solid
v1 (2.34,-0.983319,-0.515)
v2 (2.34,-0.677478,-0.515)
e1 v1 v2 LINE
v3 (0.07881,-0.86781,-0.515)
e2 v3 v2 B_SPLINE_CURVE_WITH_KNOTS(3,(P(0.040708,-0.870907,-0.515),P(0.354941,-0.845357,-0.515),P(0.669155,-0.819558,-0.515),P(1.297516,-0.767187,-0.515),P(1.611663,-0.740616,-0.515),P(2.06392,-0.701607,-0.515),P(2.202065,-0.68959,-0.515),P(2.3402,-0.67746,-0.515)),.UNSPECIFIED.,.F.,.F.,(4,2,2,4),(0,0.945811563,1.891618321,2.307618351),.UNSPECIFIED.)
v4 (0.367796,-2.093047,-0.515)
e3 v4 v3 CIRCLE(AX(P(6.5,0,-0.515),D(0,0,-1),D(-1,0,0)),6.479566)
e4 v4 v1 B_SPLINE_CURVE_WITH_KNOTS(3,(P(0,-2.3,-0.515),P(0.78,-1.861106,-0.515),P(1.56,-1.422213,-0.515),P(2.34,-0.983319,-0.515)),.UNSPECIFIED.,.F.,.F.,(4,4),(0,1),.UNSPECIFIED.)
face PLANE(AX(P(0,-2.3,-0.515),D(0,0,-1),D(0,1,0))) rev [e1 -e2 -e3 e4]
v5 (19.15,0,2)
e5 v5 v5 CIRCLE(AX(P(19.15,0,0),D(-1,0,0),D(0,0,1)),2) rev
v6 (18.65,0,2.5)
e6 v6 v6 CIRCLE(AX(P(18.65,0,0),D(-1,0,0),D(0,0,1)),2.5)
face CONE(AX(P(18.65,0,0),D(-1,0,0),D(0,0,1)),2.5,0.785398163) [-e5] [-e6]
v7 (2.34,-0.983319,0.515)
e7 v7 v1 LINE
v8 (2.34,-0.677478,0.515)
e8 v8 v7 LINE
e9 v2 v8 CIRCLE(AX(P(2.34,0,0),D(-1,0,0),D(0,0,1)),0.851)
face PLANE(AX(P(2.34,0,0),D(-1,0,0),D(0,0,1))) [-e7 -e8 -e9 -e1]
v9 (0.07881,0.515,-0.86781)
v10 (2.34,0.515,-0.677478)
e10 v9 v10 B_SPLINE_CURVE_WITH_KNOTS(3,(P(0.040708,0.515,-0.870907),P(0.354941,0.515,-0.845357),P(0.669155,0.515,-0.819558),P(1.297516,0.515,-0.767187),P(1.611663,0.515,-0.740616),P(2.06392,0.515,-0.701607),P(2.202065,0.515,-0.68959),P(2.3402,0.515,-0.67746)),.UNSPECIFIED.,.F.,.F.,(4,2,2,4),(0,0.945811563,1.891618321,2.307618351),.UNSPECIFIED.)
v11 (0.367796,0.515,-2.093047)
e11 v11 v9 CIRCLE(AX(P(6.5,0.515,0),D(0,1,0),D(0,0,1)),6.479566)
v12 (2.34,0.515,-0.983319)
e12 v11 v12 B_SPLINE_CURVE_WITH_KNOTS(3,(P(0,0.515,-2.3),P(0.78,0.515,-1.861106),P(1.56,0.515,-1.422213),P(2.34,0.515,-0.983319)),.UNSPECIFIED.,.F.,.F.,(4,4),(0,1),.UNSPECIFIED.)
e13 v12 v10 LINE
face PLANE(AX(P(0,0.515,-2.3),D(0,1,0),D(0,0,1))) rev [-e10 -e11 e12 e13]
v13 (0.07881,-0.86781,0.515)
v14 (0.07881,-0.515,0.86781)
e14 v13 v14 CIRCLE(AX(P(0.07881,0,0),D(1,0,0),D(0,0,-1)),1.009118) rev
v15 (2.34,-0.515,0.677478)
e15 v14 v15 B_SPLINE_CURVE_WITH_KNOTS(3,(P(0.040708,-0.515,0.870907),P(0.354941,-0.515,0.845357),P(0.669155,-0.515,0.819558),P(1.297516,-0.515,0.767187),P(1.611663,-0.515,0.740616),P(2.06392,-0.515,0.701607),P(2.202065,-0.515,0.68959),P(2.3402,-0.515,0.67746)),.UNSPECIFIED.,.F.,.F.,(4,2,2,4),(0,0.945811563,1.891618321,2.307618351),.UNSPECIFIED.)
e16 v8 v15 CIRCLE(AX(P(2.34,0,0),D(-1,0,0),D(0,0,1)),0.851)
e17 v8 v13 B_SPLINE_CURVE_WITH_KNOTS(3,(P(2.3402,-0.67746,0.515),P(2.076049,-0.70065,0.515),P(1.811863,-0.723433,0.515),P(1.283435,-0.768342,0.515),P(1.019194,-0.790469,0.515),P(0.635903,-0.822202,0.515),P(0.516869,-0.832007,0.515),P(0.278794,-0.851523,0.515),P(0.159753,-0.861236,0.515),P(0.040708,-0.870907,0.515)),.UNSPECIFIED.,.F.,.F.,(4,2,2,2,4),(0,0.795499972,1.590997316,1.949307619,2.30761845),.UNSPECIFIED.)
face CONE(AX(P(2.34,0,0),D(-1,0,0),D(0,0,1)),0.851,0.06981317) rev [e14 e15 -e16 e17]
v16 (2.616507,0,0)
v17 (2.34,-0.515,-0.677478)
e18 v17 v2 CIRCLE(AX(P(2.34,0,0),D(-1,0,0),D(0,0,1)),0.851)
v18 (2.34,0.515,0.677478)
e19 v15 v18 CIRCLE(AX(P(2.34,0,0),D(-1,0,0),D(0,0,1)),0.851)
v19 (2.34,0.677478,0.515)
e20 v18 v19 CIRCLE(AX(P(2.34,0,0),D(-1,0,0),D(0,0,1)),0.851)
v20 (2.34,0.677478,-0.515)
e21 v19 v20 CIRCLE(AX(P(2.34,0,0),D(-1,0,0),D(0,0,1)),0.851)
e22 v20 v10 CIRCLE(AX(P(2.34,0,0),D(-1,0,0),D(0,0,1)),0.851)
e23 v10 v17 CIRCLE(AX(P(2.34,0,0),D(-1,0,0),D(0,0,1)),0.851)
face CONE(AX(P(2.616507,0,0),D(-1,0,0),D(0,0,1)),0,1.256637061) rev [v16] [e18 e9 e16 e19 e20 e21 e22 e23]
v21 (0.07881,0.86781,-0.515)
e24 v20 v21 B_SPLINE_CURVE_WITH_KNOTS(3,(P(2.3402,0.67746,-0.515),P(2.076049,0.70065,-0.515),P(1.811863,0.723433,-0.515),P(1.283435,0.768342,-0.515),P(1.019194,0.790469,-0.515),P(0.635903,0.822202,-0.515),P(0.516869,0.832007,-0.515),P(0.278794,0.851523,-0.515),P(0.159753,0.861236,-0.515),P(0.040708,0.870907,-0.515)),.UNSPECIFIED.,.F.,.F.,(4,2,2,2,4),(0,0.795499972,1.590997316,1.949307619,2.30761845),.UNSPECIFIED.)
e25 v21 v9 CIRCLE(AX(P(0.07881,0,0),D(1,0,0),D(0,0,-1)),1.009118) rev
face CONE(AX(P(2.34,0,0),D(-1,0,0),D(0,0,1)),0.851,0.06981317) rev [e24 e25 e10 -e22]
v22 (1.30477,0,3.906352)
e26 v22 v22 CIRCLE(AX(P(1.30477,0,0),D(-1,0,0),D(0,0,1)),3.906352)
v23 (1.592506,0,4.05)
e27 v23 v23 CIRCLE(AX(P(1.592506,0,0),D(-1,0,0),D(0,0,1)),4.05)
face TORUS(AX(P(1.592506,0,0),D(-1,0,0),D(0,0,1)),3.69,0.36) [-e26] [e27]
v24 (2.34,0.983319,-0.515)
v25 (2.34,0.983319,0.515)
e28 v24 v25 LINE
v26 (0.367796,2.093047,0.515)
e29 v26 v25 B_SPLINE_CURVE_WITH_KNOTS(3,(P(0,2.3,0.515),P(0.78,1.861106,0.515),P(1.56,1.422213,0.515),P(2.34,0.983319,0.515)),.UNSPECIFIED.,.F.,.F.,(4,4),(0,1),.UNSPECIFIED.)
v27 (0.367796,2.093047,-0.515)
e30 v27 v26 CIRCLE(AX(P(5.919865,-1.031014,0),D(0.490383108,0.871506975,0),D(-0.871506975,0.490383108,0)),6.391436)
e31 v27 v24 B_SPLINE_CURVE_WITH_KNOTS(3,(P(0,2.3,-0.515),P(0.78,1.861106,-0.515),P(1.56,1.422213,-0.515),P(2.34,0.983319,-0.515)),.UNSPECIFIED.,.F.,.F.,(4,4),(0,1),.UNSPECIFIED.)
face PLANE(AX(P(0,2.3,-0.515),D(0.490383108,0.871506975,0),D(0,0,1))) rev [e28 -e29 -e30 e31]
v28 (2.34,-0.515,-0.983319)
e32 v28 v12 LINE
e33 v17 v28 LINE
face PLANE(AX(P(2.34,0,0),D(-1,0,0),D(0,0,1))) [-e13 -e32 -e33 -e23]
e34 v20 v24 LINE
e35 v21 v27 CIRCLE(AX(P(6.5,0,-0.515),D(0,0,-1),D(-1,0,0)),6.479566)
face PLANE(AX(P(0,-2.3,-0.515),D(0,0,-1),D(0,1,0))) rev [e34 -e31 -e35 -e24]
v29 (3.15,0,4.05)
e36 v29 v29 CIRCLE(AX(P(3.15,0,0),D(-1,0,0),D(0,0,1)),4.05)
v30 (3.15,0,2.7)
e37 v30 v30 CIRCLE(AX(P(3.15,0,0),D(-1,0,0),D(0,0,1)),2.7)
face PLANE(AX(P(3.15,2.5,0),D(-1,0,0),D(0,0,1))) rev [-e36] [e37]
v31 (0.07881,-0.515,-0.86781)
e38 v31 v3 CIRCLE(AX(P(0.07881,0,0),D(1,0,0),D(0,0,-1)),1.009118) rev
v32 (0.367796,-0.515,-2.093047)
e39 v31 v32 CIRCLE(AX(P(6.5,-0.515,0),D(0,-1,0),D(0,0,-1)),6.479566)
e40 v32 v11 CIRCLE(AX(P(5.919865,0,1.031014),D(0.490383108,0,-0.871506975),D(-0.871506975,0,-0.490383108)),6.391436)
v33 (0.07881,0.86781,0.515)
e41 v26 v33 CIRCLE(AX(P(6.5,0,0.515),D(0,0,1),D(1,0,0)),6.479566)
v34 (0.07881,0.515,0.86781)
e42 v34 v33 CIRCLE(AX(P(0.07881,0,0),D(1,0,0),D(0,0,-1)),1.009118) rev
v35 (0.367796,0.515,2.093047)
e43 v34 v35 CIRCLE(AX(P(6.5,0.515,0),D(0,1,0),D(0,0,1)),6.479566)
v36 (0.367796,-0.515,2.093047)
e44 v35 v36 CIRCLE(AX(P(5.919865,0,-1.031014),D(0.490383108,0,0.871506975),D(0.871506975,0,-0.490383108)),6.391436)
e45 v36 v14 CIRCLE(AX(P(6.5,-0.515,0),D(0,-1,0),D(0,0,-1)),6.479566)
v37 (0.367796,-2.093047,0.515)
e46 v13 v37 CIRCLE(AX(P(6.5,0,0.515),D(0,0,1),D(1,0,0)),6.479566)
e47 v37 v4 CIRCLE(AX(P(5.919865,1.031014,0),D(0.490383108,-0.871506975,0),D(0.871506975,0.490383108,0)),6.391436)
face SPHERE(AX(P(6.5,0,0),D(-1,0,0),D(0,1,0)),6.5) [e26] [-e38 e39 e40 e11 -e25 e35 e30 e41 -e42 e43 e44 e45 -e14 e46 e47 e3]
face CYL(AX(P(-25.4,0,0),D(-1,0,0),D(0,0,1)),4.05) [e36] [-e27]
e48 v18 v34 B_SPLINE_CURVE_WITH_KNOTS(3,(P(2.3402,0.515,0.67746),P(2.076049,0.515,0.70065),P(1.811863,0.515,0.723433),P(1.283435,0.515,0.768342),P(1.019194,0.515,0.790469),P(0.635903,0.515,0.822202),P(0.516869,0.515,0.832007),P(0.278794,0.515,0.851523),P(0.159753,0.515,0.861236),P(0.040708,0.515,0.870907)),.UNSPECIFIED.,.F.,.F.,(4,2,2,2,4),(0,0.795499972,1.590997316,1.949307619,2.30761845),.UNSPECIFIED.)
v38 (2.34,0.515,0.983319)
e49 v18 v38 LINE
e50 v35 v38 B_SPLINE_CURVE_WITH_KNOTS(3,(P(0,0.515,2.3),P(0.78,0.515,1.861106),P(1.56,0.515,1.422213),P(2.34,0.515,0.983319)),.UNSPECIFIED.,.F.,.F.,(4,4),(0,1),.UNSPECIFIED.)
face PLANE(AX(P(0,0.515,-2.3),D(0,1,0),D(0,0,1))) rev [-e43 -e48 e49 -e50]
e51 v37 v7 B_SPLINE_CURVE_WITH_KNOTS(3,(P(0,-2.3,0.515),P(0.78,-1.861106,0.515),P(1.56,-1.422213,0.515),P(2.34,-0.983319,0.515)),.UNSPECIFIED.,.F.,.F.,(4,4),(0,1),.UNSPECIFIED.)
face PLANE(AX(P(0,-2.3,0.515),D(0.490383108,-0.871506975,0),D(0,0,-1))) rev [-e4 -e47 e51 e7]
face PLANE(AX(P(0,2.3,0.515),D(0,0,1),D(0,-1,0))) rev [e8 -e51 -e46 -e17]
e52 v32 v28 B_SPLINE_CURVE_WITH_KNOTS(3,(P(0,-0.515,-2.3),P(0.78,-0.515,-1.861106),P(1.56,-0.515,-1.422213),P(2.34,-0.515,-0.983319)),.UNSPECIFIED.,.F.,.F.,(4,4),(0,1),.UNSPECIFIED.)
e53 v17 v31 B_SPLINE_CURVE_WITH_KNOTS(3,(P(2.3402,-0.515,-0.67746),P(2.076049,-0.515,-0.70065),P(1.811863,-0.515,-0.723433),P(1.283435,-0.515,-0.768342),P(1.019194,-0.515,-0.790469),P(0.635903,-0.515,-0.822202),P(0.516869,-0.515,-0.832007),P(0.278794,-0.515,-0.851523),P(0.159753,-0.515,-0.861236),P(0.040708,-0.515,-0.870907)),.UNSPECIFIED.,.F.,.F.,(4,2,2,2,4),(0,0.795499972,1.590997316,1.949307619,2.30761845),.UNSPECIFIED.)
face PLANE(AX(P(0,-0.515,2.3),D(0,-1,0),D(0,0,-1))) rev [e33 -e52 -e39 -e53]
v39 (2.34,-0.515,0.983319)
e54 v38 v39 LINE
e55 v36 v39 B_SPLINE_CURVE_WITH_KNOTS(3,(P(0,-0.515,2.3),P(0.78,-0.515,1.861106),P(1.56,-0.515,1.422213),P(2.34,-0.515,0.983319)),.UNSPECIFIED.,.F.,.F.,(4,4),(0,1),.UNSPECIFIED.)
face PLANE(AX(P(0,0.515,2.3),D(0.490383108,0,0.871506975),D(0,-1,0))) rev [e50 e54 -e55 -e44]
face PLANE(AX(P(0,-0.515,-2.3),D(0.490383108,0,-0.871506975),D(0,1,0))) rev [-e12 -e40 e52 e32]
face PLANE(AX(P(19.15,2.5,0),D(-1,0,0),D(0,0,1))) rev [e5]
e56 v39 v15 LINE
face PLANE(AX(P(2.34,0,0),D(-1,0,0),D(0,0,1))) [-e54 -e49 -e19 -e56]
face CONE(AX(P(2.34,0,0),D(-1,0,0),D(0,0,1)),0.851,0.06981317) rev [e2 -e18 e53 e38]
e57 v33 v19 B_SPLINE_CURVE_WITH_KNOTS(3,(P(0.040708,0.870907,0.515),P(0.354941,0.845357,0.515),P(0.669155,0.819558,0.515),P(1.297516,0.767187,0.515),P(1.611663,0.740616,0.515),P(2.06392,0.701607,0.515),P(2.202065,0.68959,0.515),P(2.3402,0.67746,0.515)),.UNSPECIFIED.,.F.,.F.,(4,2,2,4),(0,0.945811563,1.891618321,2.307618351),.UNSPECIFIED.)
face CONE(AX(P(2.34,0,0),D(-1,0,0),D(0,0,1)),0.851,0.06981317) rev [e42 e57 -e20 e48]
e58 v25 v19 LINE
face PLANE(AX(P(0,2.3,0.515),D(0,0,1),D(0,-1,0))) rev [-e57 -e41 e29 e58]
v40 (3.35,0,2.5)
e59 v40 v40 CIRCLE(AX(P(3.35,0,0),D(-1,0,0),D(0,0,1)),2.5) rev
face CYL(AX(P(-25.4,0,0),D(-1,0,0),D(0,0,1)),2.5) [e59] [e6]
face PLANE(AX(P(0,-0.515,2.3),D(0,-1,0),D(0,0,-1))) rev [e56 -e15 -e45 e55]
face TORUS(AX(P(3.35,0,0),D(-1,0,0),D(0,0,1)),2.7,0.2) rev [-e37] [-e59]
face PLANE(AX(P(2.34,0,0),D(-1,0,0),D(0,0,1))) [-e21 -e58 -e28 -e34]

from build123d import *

# Parameters (mm, degrees)
CONG_1_R                             = 0.2
ENL_VEMENT_START                     = -0.515
ENL_VEMENT_DE_MATI_RE_LISSAGE1_DEPTH = 1.03
R_P_TITION_CIRCULAIRE1_COUNT         = 2
R_P_TITION_CIRCULAIRE1_ANGLE         = 90
CHANFREIN1_SIZE                      = 0.5


# Read off the part's stored shape, not the designer's step: Enlèvement de matière-Lissage1
with BuildPart() as part:
    # Esquisse1 → Révolution1 (revolve)
    with BuildSketch(Plane.XY, mode=Mode.PRIVATE) as r_volution1_sk:
        with BuildLine():
            Line((3.15, 2.5), (3.15, 4.05))
            Line((3.15, 4.05), (1.592505731, 4.05))
            ThreePointArc((1.592505731, 4.05), (1.431705614, 4.012092102), (1.304769911, 3.906351792))
            ThreePointArc((1.304769911, 3.906351792), (0.334815673, 2.059247972), (0, 0))
            Line((0, 0), (19.15, 0))
            Line((19.15, 0), (19.15, 2.5))
            Line((19.15, 2.5), (3.15, 2.5))
        make_face()
    revolve(r_volution1_sk.sketch.rotate(Axis((-25.4, 0, 0), (1, 0, 0)), 90), axis=Axis((-25.4, 0, 0), (1, 0, 0)))

    # Congé1
    cong_1_edges = [part.edges().sort_by_distance(p)[0] for p in [
        (3.15, 0, -2.5),
    ]]
    fillet(cong_1_edges, radius=CONG_1_R)

    # Enlèvement de matière-Lissage1 outline → Enlèvement de matière-Lissage1 (cut)
    with BuildSketch(Plane.XY.offset(ENL_VEMENT_START)):
        Polygon((2.34, -0.983319232), (2.34, 0.983319232), (0.349683815, 2.103238481), (-1, 2.862684089), (-1, -2.862684089), (0.349683815, -2.103238481), align=None)
    enl_vement_de_mati_re_lissage1 = extrude(amount=ENL_VEMENT_DE_MATI_RE_LISSAGE1_DEPTH, mode=Mode.SUBTRACT)

    # Répétition circulaire1: Enlèvement de matière-Lissage1 ×2 about axis
    r_p_tition_circulaire1_axis = Axis((0, 0, 0), (-1, 0, 0))
    for i in range(1, R_P_TITION_CIRCULAIRE1_COUNT):
        add(enl_vement_de_mati_re_lissage1.rotate(r_p_tition_circulaire1_axis, i * R_P_TITION_CIRCULAIRE1_ANGLE / (R_P_TITION_CIRCULAIRE1_COUNT - 1)), mode=Mode.SUBTRACT)

    # Esquisse4 → Enlèvement de matière-Révolution1 (revolve, cut)
    with BuildSketch(Plane.XY, mode=Mode.PRIVATE) as enl_vement_de_mati_re_r_volution1_sk:
        Polygon((0, 0), (0, 1.01462874), (2.34, 0.851), (2.616506661, 0), align=None)
    revolve(enl_vement_de_mati_re_r_volution1_sk.sketch.rotate(Axis((-3.175, 0, 0), (1, 0, 0)), 13.8231891), axis=Axis((-3.175, 0, 0), (1, 0, 0)), mode=Mode.SUBTRACT)

    # Chanfrein1
    chanfrein1_edges = [part.edges().sort_by_distance(p)[0] for p in [
        (19.15, 0, -2.5),
    ]]
    chamfer(chanfrein1_edges, length=CHANFREIN1_SIZE)


solid = part.part
